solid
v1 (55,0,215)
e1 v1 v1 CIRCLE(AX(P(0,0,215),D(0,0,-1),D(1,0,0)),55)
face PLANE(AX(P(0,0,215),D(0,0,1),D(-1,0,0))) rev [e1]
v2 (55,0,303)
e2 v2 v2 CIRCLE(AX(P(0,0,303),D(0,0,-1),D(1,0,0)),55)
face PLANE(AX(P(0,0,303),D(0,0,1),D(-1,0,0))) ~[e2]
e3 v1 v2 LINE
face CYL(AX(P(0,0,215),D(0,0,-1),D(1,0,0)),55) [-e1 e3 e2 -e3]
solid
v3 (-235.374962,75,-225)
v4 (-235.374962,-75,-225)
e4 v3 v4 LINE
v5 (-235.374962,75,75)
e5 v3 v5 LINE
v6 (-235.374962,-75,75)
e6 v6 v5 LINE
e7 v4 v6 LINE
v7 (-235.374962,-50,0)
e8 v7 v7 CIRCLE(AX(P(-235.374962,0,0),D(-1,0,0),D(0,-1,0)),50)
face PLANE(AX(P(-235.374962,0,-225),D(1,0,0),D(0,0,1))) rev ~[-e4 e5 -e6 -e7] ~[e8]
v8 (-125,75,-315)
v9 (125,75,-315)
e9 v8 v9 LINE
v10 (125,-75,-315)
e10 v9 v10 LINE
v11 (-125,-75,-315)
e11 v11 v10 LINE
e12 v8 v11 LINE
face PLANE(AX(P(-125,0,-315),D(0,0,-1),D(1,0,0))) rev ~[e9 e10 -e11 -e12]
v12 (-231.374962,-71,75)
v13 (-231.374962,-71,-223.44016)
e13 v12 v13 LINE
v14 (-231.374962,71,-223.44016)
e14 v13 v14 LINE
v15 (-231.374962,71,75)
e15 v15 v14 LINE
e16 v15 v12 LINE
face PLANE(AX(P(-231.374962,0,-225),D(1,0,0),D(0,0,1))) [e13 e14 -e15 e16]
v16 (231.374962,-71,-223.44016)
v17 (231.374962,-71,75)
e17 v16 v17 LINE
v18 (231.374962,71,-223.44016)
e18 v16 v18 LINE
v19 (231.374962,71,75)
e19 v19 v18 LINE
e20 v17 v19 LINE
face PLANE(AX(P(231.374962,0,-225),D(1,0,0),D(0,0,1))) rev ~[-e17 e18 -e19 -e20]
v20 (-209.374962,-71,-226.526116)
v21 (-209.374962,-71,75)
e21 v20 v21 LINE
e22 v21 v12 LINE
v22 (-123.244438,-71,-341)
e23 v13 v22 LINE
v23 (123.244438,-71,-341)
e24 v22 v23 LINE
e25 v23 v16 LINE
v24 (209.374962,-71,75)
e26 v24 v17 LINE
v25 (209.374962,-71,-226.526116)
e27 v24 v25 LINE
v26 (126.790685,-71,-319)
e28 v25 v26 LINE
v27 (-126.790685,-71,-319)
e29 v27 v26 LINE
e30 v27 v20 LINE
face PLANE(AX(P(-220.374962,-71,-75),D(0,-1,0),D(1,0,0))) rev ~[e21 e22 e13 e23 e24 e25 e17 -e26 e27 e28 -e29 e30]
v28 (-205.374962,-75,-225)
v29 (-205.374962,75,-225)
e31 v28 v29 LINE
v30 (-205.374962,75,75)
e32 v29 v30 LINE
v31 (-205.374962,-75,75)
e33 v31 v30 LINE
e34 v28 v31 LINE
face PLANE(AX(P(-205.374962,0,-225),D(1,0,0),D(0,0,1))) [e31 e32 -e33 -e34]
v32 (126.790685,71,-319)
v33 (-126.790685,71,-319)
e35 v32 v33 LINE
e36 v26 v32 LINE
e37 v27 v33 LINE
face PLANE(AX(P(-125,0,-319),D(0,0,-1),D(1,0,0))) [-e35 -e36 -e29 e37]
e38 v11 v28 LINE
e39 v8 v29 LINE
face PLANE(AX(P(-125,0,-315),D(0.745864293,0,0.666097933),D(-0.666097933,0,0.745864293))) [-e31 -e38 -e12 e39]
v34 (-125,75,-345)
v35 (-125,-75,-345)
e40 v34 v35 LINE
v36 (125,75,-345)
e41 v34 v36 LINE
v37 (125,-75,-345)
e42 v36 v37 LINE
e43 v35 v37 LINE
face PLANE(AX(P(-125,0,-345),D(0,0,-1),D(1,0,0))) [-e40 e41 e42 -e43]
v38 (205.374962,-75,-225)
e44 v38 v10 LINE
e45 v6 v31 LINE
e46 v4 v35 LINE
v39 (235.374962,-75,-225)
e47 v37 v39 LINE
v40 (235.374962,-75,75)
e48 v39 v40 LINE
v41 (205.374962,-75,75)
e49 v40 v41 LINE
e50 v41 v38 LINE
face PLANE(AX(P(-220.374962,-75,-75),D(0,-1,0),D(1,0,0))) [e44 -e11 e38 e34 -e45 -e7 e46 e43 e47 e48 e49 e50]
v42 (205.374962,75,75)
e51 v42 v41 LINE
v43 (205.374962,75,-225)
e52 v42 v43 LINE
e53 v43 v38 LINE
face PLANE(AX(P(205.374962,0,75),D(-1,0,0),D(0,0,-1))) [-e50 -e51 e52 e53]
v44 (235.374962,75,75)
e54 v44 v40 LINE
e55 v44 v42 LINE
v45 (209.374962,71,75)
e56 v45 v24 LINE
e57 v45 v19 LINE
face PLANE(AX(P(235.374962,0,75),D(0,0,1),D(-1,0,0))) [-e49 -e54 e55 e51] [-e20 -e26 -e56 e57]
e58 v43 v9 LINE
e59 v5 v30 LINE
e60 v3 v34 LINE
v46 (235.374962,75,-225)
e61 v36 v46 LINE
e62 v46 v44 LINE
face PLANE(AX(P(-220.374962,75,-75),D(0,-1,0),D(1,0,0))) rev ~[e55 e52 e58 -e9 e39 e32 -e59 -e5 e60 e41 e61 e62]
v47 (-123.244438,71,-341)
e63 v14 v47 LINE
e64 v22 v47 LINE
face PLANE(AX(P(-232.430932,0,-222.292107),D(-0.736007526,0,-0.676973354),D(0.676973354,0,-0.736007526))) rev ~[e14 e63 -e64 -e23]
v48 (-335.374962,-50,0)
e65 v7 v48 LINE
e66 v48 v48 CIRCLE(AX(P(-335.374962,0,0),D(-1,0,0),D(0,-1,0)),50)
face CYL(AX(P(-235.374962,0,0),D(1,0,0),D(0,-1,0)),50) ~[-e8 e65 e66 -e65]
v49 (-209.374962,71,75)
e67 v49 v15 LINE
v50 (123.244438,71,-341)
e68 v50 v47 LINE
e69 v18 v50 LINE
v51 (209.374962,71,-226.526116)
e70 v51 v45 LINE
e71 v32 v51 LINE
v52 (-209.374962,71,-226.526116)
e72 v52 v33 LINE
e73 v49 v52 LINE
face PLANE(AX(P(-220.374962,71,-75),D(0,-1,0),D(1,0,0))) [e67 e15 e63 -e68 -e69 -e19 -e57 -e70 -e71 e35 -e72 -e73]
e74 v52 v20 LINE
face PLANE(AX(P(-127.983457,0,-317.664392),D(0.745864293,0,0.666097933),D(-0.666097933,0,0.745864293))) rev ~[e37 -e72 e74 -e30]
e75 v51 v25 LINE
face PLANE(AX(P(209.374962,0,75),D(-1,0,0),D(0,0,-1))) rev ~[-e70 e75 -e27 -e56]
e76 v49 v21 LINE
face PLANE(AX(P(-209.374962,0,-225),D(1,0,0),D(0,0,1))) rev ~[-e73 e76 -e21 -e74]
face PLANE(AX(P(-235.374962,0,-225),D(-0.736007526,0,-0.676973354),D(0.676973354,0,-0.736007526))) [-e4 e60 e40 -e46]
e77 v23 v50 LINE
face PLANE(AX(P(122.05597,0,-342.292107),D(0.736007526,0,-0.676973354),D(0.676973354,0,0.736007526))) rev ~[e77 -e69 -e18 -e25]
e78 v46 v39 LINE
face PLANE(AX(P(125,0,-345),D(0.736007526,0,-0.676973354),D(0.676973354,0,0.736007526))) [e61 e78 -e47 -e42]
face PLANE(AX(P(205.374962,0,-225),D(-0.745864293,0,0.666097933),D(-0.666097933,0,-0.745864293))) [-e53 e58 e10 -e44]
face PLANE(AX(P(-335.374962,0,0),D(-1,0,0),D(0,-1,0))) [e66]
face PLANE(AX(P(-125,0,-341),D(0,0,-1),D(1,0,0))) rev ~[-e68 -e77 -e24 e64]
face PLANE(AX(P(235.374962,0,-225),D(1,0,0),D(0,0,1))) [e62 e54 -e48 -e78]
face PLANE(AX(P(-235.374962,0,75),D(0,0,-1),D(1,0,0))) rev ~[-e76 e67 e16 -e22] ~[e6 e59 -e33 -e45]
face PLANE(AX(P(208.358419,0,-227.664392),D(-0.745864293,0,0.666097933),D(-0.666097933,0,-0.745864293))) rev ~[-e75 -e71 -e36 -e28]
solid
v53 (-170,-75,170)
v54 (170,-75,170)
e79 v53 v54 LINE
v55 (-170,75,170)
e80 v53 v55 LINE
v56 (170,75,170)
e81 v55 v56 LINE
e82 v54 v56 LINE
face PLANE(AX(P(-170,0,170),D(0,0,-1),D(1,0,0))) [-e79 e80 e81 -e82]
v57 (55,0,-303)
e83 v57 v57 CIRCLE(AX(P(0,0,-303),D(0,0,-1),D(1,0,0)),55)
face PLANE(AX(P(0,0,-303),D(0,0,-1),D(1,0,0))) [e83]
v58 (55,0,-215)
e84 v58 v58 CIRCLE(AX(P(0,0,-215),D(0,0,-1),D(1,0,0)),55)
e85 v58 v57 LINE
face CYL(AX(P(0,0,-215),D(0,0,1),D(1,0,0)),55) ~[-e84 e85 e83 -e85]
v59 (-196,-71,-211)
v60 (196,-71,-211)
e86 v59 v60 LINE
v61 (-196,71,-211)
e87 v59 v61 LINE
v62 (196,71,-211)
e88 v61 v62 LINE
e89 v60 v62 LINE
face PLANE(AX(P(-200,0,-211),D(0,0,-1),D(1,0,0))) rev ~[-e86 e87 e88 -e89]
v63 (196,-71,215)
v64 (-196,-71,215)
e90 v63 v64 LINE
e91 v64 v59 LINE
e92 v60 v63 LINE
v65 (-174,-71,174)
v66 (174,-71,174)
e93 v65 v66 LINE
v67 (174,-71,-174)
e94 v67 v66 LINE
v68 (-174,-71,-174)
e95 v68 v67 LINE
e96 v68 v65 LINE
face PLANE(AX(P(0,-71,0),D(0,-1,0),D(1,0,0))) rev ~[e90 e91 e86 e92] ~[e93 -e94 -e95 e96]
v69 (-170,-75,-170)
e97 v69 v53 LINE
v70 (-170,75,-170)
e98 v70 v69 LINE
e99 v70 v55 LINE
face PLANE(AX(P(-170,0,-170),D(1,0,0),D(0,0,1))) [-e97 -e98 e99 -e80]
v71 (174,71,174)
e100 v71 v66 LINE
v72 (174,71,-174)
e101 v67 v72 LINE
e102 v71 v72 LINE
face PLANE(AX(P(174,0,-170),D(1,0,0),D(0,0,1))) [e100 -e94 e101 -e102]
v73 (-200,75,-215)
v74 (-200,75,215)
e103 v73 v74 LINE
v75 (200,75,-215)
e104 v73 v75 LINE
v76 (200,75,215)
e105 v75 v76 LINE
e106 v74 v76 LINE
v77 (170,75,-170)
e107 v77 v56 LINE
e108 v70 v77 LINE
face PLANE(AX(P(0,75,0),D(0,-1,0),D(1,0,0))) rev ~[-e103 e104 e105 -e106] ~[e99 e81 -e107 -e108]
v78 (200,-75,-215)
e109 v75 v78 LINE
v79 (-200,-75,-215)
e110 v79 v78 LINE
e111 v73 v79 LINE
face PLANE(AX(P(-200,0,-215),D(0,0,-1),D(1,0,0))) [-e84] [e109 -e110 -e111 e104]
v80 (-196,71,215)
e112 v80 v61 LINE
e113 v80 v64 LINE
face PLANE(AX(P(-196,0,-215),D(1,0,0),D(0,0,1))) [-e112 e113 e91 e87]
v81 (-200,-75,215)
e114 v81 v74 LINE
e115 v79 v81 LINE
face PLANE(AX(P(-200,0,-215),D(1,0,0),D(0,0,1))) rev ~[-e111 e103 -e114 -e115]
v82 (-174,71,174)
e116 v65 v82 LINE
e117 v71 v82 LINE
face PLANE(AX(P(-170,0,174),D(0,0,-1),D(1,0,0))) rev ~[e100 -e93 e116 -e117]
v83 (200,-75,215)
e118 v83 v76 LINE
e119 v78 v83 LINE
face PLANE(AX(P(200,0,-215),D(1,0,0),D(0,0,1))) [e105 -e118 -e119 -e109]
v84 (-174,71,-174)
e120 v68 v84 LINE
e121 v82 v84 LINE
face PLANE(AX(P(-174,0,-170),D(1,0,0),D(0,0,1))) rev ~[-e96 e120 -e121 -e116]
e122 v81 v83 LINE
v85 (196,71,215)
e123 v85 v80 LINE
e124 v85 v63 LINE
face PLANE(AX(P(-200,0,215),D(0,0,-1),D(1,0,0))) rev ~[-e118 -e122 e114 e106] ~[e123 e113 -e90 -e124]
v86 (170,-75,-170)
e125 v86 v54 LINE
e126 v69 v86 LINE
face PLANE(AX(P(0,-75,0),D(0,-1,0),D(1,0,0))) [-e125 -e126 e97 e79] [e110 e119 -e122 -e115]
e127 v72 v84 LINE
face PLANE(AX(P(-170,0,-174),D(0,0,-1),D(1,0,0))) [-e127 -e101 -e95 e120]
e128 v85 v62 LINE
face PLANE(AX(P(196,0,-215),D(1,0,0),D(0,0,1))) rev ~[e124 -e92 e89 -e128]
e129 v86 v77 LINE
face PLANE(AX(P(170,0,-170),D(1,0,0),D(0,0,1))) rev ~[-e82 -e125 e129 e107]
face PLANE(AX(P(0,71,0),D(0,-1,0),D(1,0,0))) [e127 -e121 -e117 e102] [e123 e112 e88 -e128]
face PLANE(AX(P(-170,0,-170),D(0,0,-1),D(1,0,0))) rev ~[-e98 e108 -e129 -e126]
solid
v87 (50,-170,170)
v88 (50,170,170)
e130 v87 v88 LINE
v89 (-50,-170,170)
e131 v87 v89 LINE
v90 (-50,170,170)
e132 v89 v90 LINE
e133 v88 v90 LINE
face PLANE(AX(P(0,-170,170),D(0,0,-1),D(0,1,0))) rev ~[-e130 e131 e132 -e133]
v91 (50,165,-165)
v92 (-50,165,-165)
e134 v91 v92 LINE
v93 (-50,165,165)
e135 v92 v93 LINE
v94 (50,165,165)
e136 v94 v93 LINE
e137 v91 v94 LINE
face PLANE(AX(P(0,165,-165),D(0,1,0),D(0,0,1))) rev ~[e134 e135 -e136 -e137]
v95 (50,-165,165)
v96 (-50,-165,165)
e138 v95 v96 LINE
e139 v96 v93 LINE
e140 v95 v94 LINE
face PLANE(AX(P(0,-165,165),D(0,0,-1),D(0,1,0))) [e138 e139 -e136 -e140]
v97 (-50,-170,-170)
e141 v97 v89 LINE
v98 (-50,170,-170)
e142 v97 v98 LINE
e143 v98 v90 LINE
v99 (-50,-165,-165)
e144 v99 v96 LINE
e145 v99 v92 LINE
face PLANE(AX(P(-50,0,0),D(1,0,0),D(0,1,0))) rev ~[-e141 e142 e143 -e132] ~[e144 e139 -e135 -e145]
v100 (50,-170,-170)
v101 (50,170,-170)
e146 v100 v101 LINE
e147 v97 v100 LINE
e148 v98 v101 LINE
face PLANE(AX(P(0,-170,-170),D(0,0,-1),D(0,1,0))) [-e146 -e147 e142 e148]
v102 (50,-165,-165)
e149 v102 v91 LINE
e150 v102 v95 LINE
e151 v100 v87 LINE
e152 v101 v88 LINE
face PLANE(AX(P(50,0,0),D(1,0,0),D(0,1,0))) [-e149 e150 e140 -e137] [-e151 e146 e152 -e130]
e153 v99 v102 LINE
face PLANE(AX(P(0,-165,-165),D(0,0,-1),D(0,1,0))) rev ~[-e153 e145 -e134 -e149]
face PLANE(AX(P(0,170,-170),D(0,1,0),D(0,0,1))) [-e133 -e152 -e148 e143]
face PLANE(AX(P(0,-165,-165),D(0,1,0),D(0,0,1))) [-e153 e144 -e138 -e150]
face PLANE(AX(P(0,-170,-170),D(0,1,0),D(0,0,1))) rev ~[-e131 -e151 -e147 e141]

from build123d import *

# Parameters (mm, degrees)
F0_W      = 340
F0_H      = 340
F0_W_2    = 330
F0_H_2    = 330
F1_DEPTH  = 50
F2_W      = 400
F2_H      = 430
F2_W_2    = 340
F2_H_2    = 340
F3_DEPTH  = 75
F4_W      = 30
F4_H      = 300
F4_W_2    = 250
F4_H_2    = 30
F5_DEPTH  = 75
F6_T      = -4
F8_T      = -4
F7_R      = 50
F9_DEPTH  = 100
F10_R     = 55
F11_DEPTH = 88


# Not quite as in the source:
# - a pattern or mirror of a feature is missing from the dataset's text; its kind, count and spacing are read off the source's solid


with BuildPart() as f1:
    # F0 (on Right) → F1 (new body, symmetric)
    with BuildSketch(Plane.YZ):
        Rectangle(F0_W, F0_H)
        Rectangle(F0_W_2, F0_H_2, mode=Mode.SUBTRACT)
    extrude(amount=F1_DEPTH, both=True)


with BuildPart() as f3:
    # F2 (on Front) → F3 (new body, symmetric)
    with BuildSketch(Plane.XZ):
        Rectangle(F2_W, F2_H)
        Rectangle(F2_W_2, F2_H_2, mode=Mode.SUBTRACT)
    extrude(amount=F3_DEPTH, both=True)

    # F8
    f8_openings = [f3.faces().sort_by_distance(p)[0] for p in [
        (0, 0, 215),
    ]]
    offset(amount=F8_T, openings=f8_openings, kind=Kind.INTERSECTION)

    # F10 (on face) → F11 (join)
    with BuildSketch(Plane(origin=(0, 0, -215), x_dir=(1, 0, 0), z_dir=(0, 0, -1))):
        Circle(F10_R)
    f11 = extrude(amount=F11_DEPTH)

    # F11_copies: F11 across plane
    add(f11.mirror(Plane.XY))


with BuildPart() as f5:
    # F4 (on Front) → F5 (new body, symmetric)
    with BuildSketch(Plane.XZ):
        with Locations((-220.3749617156, -75)):
            Rectangle(F4_W, F4_H)
        Polygon((-205.3749617156, -225), (-235.3749617156, -225), (-125, -345), (-125, -315), align=None)
        with Locations((0, -330)):
            Rectangle(F4_W_2, F4_H_2)
        Polygon((125, -315), (125, -345), (235.3749617156, -225), (235.3749617156, 75), (205.3749617156, 75), (205.3749617156, -225), align=None)
    extrude(amount=F5_DEPTH, both=True)

    # F6
    f6_openings = [f5.faces().sort_by_distance(p)[0] for p in [
        (-220.374962, 0, 75),
        (220.374962, 0, 75),
    ]]
    offset(amount=F6_T, openings=f6_openings, kind=Kind.INTERSECTION)

    # F7 (on face) → F9 (join)
    with BuildSketch(Plane(origin=(-235.3749617156, 0, 0), x_dir=(0, -1, 0), z_dir=(-1, 0, 0))):
        Circle(F7_R)
    extrude(amount=F9_DEPTH)


solid = Compound([f1.part, f3.part, f5.part])
